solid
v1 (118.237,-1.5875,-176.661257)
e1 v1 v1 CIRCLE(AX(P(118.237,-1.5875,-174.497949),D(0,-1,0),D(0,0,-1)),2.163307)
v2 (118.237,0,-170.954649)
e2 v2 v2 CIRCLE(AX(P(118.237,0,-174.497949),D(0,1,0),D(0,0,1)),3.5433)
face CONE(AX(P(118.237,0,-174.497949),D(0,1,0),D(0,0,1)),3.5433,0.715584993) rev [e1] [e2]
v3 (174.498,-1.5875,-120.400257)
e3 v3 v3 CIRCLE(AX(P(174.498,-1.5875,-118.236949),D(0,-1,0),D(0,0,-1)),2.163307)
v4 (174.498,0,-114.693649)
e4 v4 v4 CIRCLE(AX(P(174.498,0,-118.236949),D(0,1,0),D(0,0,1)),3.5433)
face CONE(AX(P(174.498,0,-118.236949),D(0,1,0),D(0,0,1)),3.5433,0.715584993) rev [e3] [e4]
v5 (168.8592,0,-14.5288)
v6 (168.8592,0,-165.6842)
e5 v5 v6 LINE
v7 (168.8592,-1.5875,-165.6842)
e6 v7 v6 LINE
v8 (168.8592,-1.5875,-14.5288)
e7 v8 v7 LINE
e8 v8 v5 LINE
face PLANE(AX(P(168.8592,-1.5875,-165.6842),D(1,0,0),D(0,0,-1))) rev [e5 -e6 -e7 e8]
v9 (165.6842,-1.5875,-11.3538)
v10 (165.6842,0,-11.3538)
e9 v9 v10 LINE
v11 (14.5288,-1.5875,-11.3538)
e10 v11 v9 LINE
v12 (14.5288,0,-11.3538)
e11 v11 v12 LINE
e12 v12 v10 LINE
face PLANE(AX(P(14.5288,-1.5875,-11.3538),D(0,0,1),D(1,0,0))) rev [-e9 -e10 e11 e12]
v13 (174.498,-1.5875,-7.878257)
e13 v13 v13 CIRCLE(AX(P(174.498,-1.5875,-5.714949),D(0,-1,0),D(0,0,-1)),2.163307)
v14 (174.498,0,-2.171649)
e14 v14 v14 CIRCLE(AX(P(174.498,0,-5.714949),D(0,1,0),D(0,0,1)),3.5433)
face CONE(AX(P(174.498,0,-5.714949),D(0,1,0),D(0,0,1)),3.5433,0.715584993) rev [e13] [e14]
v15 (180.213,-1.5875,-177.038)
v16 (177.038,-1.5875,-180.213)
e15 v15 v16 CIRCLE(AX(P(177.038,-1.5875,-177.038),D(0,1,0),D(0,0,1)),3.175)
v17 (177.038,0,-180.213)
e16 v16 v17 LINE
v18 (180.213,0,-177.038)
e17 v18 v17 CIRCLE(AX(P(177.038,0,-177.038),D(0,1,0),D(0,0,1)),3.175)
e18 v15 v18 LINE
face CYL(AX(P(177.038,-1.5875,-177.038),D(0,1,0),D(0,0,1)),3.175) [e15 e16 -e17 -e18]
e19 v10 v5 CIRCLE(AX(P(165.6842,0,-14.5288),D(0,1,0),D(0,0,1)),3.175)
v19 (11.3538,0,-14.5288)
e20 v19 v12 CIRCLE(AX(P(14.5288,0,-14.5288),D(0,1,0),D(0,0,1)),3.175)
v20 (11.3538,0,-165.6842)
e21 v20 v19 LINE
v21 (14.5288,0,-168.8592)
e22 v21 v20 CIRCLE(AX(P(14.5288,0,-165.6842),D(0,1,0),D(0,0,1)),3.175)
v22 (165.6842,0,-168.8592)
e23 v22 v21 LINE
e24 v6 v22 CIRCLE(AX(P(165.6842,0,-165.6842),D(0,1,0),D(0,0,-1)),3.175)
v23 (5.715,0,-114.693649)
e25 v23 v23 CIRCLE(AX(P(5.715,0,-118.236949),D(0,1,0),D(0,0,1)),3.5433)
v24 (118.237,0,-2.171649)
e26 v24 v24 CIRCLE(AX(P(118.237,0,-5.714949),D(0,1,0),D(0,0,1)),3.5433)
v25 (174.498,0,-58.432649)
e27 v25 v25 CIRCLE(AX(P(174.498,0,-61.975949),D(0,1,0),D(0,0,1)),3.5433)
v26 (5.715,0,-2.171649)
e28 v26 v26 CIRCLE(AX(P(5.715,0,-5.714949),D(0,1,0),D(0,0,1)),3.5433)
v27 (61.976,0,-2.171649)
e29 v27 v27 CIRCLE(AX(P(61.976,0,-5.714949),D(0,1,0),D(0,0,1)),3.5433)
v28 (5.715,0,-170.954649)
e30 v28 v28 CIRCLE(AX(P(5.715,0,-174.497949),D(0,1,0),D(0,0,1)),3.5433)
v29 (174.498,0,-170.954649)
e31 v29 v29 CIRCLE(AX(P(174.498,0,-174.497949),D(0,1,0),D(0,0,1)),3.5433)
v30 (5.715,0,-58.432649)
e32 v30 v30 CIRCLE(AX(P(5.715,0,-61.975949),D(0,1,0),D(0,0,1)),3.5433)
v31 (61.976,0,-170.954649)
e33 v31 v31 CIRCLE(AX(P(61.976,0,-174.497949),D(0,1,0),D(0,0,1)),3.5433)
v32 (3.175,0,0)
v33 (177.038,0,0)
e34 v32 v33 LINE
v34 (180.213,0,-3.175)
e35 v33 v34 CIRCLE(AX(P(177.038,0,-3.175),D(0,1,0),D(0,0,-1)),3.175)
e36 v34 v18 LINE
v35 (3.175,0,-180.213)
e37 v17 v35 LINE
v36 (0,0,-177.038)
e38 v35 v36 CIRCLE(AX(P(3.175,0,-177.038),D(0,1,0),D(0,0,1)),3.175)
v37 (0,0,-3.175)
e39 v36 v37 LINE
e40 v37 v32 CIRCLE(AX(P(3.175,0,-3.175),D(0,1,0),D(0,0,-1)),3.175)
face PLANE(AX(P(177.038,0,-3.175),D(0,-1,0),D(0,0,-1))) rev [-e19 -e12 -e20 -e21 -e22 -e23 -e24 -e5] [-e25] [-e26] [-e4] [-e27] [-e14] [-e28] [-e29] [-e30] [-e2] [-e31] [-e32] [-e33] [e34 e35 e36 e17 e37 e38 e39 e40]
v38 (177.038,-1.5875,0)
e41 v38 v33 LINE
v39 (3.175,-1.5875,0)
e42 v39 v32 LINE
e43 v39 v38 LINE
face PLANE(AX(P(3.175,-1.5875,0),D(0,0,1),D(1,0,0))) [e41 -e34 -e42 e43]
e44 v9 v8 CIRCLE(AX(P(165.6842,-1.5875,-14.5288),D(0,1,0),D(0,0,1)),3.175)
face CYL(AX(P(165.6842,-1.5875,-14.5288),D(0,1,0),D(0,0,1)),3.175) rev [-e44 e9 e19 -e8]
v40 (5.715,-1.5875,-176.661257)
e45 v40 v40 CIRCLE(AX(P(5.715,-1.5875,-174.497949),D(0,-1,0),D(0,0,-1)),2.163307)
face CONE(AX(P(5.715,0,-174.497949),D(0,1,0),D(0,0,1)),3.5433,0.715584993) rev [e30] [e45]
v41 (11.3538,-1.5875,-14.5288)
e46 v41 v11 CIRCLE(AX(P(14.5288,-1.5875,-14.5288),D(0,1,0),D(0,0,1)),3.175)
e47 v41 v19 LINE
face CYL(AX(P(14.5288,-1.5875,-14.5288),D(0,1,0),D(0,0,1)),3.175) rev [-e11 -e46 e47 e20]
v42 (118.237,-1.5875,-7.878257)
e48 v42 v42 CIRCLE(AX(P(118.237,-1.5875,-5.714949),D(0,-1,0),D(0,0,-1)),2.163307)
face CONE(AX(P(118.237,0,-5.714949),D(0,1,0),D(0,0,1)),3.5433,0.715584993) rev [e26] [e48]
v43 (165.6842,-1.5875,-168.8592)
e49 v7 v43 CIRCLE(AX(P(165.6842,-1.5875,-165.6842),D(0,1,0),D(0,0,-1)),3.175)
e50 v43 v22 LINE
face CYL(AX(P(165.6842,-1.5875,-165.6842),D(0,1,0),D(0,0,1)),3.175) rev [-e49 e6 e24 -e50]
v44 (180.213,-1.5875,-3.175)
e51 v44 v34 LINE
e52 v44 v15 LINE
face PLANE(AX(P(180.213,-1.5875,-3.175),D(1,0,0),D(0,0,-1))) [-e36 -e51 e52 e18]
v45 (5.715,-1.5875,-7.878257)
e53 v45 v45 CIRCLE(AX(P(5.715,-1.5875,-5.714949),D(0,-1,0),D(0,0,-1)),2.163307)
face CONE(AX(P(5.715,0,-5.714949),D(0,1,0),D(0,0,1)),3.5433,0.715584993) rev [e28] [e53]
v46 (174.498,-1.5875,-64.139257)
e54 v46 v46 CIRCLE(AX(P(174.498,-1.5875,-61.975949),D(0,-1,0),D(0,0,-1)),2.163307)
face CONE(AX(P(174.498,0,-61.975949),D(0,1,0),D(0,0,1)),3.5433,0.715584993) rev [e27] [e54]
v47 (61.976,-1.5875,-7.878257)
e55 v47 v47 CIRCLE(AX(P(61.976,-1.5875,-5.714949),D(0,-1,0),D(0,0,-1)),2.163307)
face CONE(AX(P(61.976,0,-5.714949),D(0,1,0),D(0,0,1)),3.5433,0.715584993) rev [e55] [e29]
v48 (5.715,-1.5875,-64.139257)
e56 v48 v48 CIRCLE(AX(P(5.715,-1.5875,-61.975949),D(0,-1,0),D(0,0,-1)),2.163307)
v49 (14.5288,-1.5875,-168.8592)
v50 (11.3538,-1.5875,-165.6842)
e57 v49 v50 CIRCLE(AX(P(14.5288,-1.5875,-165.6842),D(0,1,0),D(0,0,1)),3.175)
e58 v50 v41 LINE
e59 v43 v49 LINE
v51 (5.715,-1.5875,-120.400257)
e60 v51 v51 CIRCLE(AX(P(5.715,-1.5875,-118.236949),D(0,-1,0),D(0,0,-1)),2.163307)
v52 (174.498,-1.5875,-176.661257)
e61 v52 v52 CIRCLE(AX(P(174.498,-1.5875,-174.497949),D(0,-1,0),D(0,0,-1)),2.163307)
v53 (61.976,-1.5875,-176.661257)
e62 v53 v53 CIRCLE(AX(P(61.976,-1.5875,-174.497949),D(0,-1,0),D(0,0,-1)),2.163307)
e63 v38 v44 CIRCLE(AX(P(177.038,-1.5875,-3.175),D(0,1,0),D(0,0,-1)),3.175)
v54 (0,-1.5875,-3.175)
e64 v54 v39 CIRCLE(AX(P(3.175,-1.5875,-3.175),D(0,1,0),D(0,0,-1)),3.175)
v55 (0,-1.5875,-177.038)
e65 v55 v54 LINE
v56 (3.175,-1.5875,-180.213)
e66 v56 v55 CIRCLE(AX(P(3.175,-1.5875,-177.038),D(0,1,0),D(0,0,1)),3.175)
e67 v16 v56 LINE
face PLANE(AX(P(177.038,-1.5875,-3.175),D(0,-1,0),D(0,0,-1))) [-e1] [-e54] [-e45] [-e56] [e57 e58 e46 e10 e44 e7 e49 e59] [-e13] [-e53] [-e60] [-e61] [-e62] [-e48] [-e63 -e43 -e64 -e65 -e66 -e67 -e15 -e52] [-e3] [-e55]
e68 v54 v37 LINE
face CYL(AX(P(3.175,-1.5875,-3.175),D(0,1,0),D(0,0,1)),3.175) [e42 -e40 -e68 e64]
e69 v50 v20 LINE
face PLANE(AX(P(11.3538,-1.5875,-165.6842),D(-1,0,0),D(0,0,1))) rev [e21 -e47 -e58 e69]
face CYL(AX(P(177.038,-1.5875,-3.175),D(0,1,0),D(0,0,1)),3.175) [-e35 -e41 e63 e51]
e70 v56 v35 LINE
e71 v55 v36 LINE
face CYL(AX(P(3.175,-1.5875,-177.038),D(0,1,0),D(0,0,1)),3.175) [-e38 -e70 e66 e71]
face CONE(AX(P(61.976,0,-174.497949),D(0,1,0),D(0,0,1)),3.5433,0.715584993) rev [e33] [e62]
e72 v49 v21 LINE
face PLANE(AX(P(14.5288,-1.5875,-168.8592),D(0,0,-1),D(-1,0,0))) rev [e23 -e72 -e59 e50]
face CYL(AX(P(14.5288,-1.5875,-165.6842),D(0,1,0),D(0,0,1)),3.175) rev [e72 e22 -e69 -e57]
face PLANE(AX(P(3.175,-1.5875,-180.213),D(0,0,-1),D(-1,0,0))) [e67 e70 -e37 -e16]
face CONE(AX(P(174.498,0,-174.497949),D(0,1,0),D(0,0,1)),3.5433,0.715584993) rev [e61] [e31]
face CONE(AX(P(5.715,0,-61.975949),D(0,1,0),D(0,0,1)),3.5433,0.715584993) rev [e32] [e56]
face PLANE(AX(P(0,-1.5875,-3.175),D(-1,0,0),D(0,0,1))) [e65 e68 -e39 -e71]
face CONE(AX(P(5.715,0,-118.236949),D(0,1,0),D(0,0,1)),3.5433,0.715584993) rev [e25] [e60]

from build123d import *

# Parameters (mm, degrees)
BASE_FLANGE1_DEPTH                            = 1.5875
CUT_EXTRUDE1_DEPTH                            = 255.864612872
CSK_FOR_6_FLAT_HEAD_MACHINE_SCREW1_AT_2_COUNT = 2
CSK_FOR_6_FLAT_HEAD_MACHINE_SCREW1_AT_2_PITCH = 56.261
CSK_FOR_6_FLAT_HEAD_MACHINE_SCREW1_AT_3_COUNT = 2
CSK_FOR_6_FLAT_HEAD_MACHINE_SCREW1_AT_3_PITCH = 177.912903439
CSK_FOR_6_FLAT_HEAD_MACHINE_SCREW1_AT_4_COUNT = 2
CSK_FOR_6_FLAT_HEAD_MACHINE_SCREW1_AT_4_PITCH = 168.783
CSK_FOR_6_FLAT_HEAD_MACHINE_SCREW1_AT_5_COUNT = 2
CSK_FOR_6_FLAT_HEAD_MACHINE_SCREW1_AT_5_PITCH = 112.522
CSK_FOR_6_FLAT_HEAD_MACHINE_SCREW1_AT_6_COUNT = 2
CSK_FOR_6_FLAT_HEAD_MACHINE_SCREW1_AT_6_PITCH = 56.261
CSK_FOR_6_FLAT_HEAD_MACHINE_SCREW1_AT_7_COUNT = 2
CSK_FOR_6_FLAT_HEAD_MACHINE_SCREW1_AT_7_PITCH = 112.522
CSK_FOR_6_FLAT_HEAD_MACHINE_SCREW1_AT_8_COUNT = 2
CSK_FOR_6_FLAT_HEAD_MACHINE_SCREW1_AT_8_PITCH = 168.783
CSK_FOR_6_FLAT_HEAD_MACHINE_SCREW1_AT_9_COUNT = 2
CSK_FOR_6_FLAT_HEAD_MACHINE_SCREW1_AT_9_PITCH = 177.912903439
CSK_FOR_6_FLAT_HEAD_MACHINE_SCREW1_AT_1_COUNT = 2
CSK_FOR_6_FLAT_HEAD_MACHINE_SCREW1_AT_1_PITCH = 202.851920309
CSK_FOR_6_FLAT_HEAD_MACHINE_SCREW1_2_COUNT    = 2
CSK_FOR_6_FLAT_HEAD_MACHINE_SCREW1_2_PITCH    = 202.851920309
CSK_FOR_6_FLAT_HEAD_MACHINE_SCREW1_3_COUNT    = 2
CSK_FOR_6_FLAT_HEAD_MACHINE_SCREW1_3_PITCH    = 238.695207698


# Sheet-metal steps are written as plain solids
with BuildPart() as part:
    # Sketch2 → Base-Flange1 (new body)
    with BuildSketch(Plane(origin=(0, 0, 0), x_dir=(1, 0, 0), z_dir=(0, 1, 0))):
        with BuildLine():
            Line((3.175, 0), (177.038, 0))
            ThreePointArc((177.038, 0), (179.28306403, 0.92993597), (180.213, 3.175))
            Line((180.213, 3.175), (180.213, 177.038))
            ThreePointArc((180.213, 177.038), (179.28306403, 179.28306403), (177.038, 180.213))
            Line((177.038, 180.213), (3.175, 180.213))
            ThreePointArc((3.175, 180.213), (0.92993597, 179.28306403), (0, 177.038))
            Line((0, 177.038), (0, 3.175))
            ThreePointArc((0, 3.175), (0.92993597, 0.92993597), (3.175, 0))
        make_face()
    extrude(amount=-BASE_FLANGE1_DEPTH)

    # Sketch7 → Cut-Extrude1 (cut, through all)
    with BuildSketch(Plane(origin=(0, 0, 0), x_dir=(1, 0, 0), z_dir=(0, 1, 0))):
        with BuildLine():
            Line((14.5288, 168.8592), (165.6842, 168.8592))
            ThreePointArc((165.6842, 168.8592), (167.92926403, 167.92926403), (168.8592, 165.6842))
            Line((168.8592, 165.6842), (168.8592, 14.5288))
            ThreePointArc((168.8592, 14.5288), (167.92926403, 12.28373597), (165.6842, 11.3538))
            Line((165.6842, 11.3538), (14.5288, 11.3538))
            ThreePointArc((14.5288, 11.3538), (12.28373597, 12.28373597), (11.3538, 14.5288))
            Line((11.3538, 14.5288), (11.3538, 165.6842))
            ThreePointArc((11.3538, 165.6842), (12.28373597, 167.92926403), (14.5288, 168.8592))
        make_face()
    extrude(amount=-CUT_EXTRUDE1_DEPTH, mode=Mode.SUBTRACT)

    # Sketch8 → CSK for #6 Flat Head Machine Screw1 (revolve, cut)
    with BuildSketch(Plane(origin=(5.715, 0, -174.4979492), x_dir=(0, 0, 1), z_dir=(1, 0, 0))):
        Polygon((0, 0), (0, 1.5875), (1.8288, 1.5875), (1.8288, 1.972306634), (3.5433, 0), align=None)
    csk_for_6_flat_head_machine_screw1 = revolve(axis=Axis((5.715, 6.35, -174.4979492), (0, -1, 0)), mode=Mode.SUBTRACT)

    # CSK for #6 Flat Head Machine Screw1 at 2: CSK for #6 Flat Head Machine Screw1 ×2
    with Locations(*[(i * CSK_FOR_6_FLAT_HEAD_MACHINE_SCREW1_AT_2_PITCH, 0, 0) for i in range(1, CSK_FOR_6_FLAT_HEAD_MACHINE_SCREW1_AT_2_COUNT)]):
        add(csk_for_6_flat_head_machine_screw1, mode=Mode.SUBTRACT)

    # CSK for #6 Flat Head Machine Screw1 at 3: CSK for #6 Flat Head Machine Screw1 ×2
    with Locations(*[Vector(0.3162277660168381, 0, 0.9486832980505138) * (i * CSK_FOR_6_FLAT_HEAD_MACHINE_SCREW1_AT_3_PITCH) for i in range(1, CSK_FOR_6_FLAT_HEAD_MACHINE_SCREW1_AT_3_COUNT)]):
        add(csk_for_6_flat_head_machine_screw1, mode=Mode.SUBTRACT)

    # CSK for #6 Flat Head Machine Screw1 at 4: CSK for #6 Flat Head Machine Screw1 ×2
    with Locations(*[(0, 0, i * CSK_FOR_6_FLAT_HEAD_MACHINE_SCREW1_AT_4_PITCH) for i in range(1, CSK_FOR_6_FLAT_HEAD_MACHINE_SCREW1_AT_4_COUNT)]):
        add(csk_for_6_flat_head_machine_screw1, mode=Mode.SUBTRACT)

    # CSK for #6 Flat Head Machine Screw1 at 5: CSK for #6 Flat Head Machine Screw1 ×2
    with Locations(*[(0, 0, i * CSK_FOR_6_FLAT_HEAD_MACHINE_SCREW1_AT_5_PITCH) for i in range(1, CSK_FOR_6_FLAT_HEAD_MACHINE_SCREW1_AT_5_COUNT)]):
        add(csk_for_6_flat_head_machine_screw1, mode=Mode.SUBTRACT)

    # CSK for #6 Flat Head Machine Screw1 at 6: CSK for #6 Flat Head Machine Screw1 ×2
    with Locations(*[(0, 0, i * CSK_FOR_6_FLAT_HEAD_MACHINE_SCREW1_AT_6_PITCH) for i in range(1, CSK_FOR_6_FLAT_HEAD_MACHINE_SCREW1_AT_6_COUNT)]):
        add(csk_for_6_flat_head_machine_screw1, mode=Mode.SUBTRACT)

    # CSK for #6 Flat Head Machine Screw1 at 7: CSK for #6 Flat Head Machine Screw1 ×2
    with Locations(*[(i * CSK_FOR_6_FLAT_HEAD_MACHINE_SCREW1_AT_7_PITCH, 0, 0) for i in range(1, CSK_FOR_6_FLAT_HEAD_MACHINE_SCREW1_AT_7_COUNT)]):
        add(csk_for_6_flat_head_machine_screw1, mode=Mode.SUBTRACT)

    # CSK for #6 Flat Head Machine Screw1 at 8: CSK for #6 Flat Head Machine Screw1 ×2
    with Locations(*[(i * CSK_FOR_6_FLAT_HEAD_MACHINE_SCREW1_AT_8_PITCH, 0, 0) for i in range(1, CSK_FOR_6_FLAT_HEAD_MACHINE_SCREW1_AT_8_COUNT)]):
        add(csk_for_6_flat_head_machine_screw1, mode=Mode.SUBTRACT)

    # CSK for #6 Flat Head Machine Screw1 at 9: CSK for #6 Flat Head Machine Screw1 ×2
    with Locations(*[Vector(0.9486832980505139, 0, 0.31622776601683783) * (i * CSK_FOR_6_FLAT_HEAD_MACHINE_SCREW1_AT_9_PITCH) for i in range(1, CSK_FOR_6_FLAT_HEAD_MACHINE_SCREW1_AT_9_COUNT)]):
        add(csk_for_6_flat_head_machine_screw1, mode=Mode.SUBTRACT)

    # CSK for #6 Flat Head Machine Screw1 at 1: CSK for #6 Flat Head Machine Screw1 ×2
    with Locations(*[Vector(0.8320502943378437, 0, 0.5547001962252291) * (i * CSK_FOR_6_FLAT_HEAD_MACHINE_SCREW1_AT_1_PITCH) for i in range(1, CSK_FOR_6_FLAT_HEAD_MACHINE_SCREW1_AT_1_COUNT)]):
        add(csk_for_6_flat_head_machine_screw1, mode=Mode.SUBTRACT)

    # CSK for #6 Flat Head Machine Screw1  2: CSK for #6 Flat Head Machine Screw1 ×2
    with Locations(*[Vector(0.5547001962252293, 0, 0.8320502943378436) * (i * CSK_FOR_6_FLAT_HEAD_MACHINE_SCREW1_2_PITCH) for i in range(1, CSK_FOR_6_FLAT_HEAD_MACHINE_SCREW1_2_COUNT)]):
        add(csk_for_6_flat_head_machine_screw1, mode=Mode.SUBTRACT)

    # CSK for #6 Flat Head Machine Screw1  3: CSK for #6 Flat Head Machine Screw1 ×2
    with Locations(*[Vector(0.7071067811865477, 0, 0.7071067811865475) * (i * CSK_FOR_6_FLAT_HEAD_MACHINE_SCREW1_3_PITCH) for i in range(1, CSK_FOR_6_FLAT_HEAD_MACHINE_SCREW1_3_COUNT)]):
        add(csk_for_6_flat_head_machine_screw1, mode=Mode.SUBTRACT)


solid = part.part
